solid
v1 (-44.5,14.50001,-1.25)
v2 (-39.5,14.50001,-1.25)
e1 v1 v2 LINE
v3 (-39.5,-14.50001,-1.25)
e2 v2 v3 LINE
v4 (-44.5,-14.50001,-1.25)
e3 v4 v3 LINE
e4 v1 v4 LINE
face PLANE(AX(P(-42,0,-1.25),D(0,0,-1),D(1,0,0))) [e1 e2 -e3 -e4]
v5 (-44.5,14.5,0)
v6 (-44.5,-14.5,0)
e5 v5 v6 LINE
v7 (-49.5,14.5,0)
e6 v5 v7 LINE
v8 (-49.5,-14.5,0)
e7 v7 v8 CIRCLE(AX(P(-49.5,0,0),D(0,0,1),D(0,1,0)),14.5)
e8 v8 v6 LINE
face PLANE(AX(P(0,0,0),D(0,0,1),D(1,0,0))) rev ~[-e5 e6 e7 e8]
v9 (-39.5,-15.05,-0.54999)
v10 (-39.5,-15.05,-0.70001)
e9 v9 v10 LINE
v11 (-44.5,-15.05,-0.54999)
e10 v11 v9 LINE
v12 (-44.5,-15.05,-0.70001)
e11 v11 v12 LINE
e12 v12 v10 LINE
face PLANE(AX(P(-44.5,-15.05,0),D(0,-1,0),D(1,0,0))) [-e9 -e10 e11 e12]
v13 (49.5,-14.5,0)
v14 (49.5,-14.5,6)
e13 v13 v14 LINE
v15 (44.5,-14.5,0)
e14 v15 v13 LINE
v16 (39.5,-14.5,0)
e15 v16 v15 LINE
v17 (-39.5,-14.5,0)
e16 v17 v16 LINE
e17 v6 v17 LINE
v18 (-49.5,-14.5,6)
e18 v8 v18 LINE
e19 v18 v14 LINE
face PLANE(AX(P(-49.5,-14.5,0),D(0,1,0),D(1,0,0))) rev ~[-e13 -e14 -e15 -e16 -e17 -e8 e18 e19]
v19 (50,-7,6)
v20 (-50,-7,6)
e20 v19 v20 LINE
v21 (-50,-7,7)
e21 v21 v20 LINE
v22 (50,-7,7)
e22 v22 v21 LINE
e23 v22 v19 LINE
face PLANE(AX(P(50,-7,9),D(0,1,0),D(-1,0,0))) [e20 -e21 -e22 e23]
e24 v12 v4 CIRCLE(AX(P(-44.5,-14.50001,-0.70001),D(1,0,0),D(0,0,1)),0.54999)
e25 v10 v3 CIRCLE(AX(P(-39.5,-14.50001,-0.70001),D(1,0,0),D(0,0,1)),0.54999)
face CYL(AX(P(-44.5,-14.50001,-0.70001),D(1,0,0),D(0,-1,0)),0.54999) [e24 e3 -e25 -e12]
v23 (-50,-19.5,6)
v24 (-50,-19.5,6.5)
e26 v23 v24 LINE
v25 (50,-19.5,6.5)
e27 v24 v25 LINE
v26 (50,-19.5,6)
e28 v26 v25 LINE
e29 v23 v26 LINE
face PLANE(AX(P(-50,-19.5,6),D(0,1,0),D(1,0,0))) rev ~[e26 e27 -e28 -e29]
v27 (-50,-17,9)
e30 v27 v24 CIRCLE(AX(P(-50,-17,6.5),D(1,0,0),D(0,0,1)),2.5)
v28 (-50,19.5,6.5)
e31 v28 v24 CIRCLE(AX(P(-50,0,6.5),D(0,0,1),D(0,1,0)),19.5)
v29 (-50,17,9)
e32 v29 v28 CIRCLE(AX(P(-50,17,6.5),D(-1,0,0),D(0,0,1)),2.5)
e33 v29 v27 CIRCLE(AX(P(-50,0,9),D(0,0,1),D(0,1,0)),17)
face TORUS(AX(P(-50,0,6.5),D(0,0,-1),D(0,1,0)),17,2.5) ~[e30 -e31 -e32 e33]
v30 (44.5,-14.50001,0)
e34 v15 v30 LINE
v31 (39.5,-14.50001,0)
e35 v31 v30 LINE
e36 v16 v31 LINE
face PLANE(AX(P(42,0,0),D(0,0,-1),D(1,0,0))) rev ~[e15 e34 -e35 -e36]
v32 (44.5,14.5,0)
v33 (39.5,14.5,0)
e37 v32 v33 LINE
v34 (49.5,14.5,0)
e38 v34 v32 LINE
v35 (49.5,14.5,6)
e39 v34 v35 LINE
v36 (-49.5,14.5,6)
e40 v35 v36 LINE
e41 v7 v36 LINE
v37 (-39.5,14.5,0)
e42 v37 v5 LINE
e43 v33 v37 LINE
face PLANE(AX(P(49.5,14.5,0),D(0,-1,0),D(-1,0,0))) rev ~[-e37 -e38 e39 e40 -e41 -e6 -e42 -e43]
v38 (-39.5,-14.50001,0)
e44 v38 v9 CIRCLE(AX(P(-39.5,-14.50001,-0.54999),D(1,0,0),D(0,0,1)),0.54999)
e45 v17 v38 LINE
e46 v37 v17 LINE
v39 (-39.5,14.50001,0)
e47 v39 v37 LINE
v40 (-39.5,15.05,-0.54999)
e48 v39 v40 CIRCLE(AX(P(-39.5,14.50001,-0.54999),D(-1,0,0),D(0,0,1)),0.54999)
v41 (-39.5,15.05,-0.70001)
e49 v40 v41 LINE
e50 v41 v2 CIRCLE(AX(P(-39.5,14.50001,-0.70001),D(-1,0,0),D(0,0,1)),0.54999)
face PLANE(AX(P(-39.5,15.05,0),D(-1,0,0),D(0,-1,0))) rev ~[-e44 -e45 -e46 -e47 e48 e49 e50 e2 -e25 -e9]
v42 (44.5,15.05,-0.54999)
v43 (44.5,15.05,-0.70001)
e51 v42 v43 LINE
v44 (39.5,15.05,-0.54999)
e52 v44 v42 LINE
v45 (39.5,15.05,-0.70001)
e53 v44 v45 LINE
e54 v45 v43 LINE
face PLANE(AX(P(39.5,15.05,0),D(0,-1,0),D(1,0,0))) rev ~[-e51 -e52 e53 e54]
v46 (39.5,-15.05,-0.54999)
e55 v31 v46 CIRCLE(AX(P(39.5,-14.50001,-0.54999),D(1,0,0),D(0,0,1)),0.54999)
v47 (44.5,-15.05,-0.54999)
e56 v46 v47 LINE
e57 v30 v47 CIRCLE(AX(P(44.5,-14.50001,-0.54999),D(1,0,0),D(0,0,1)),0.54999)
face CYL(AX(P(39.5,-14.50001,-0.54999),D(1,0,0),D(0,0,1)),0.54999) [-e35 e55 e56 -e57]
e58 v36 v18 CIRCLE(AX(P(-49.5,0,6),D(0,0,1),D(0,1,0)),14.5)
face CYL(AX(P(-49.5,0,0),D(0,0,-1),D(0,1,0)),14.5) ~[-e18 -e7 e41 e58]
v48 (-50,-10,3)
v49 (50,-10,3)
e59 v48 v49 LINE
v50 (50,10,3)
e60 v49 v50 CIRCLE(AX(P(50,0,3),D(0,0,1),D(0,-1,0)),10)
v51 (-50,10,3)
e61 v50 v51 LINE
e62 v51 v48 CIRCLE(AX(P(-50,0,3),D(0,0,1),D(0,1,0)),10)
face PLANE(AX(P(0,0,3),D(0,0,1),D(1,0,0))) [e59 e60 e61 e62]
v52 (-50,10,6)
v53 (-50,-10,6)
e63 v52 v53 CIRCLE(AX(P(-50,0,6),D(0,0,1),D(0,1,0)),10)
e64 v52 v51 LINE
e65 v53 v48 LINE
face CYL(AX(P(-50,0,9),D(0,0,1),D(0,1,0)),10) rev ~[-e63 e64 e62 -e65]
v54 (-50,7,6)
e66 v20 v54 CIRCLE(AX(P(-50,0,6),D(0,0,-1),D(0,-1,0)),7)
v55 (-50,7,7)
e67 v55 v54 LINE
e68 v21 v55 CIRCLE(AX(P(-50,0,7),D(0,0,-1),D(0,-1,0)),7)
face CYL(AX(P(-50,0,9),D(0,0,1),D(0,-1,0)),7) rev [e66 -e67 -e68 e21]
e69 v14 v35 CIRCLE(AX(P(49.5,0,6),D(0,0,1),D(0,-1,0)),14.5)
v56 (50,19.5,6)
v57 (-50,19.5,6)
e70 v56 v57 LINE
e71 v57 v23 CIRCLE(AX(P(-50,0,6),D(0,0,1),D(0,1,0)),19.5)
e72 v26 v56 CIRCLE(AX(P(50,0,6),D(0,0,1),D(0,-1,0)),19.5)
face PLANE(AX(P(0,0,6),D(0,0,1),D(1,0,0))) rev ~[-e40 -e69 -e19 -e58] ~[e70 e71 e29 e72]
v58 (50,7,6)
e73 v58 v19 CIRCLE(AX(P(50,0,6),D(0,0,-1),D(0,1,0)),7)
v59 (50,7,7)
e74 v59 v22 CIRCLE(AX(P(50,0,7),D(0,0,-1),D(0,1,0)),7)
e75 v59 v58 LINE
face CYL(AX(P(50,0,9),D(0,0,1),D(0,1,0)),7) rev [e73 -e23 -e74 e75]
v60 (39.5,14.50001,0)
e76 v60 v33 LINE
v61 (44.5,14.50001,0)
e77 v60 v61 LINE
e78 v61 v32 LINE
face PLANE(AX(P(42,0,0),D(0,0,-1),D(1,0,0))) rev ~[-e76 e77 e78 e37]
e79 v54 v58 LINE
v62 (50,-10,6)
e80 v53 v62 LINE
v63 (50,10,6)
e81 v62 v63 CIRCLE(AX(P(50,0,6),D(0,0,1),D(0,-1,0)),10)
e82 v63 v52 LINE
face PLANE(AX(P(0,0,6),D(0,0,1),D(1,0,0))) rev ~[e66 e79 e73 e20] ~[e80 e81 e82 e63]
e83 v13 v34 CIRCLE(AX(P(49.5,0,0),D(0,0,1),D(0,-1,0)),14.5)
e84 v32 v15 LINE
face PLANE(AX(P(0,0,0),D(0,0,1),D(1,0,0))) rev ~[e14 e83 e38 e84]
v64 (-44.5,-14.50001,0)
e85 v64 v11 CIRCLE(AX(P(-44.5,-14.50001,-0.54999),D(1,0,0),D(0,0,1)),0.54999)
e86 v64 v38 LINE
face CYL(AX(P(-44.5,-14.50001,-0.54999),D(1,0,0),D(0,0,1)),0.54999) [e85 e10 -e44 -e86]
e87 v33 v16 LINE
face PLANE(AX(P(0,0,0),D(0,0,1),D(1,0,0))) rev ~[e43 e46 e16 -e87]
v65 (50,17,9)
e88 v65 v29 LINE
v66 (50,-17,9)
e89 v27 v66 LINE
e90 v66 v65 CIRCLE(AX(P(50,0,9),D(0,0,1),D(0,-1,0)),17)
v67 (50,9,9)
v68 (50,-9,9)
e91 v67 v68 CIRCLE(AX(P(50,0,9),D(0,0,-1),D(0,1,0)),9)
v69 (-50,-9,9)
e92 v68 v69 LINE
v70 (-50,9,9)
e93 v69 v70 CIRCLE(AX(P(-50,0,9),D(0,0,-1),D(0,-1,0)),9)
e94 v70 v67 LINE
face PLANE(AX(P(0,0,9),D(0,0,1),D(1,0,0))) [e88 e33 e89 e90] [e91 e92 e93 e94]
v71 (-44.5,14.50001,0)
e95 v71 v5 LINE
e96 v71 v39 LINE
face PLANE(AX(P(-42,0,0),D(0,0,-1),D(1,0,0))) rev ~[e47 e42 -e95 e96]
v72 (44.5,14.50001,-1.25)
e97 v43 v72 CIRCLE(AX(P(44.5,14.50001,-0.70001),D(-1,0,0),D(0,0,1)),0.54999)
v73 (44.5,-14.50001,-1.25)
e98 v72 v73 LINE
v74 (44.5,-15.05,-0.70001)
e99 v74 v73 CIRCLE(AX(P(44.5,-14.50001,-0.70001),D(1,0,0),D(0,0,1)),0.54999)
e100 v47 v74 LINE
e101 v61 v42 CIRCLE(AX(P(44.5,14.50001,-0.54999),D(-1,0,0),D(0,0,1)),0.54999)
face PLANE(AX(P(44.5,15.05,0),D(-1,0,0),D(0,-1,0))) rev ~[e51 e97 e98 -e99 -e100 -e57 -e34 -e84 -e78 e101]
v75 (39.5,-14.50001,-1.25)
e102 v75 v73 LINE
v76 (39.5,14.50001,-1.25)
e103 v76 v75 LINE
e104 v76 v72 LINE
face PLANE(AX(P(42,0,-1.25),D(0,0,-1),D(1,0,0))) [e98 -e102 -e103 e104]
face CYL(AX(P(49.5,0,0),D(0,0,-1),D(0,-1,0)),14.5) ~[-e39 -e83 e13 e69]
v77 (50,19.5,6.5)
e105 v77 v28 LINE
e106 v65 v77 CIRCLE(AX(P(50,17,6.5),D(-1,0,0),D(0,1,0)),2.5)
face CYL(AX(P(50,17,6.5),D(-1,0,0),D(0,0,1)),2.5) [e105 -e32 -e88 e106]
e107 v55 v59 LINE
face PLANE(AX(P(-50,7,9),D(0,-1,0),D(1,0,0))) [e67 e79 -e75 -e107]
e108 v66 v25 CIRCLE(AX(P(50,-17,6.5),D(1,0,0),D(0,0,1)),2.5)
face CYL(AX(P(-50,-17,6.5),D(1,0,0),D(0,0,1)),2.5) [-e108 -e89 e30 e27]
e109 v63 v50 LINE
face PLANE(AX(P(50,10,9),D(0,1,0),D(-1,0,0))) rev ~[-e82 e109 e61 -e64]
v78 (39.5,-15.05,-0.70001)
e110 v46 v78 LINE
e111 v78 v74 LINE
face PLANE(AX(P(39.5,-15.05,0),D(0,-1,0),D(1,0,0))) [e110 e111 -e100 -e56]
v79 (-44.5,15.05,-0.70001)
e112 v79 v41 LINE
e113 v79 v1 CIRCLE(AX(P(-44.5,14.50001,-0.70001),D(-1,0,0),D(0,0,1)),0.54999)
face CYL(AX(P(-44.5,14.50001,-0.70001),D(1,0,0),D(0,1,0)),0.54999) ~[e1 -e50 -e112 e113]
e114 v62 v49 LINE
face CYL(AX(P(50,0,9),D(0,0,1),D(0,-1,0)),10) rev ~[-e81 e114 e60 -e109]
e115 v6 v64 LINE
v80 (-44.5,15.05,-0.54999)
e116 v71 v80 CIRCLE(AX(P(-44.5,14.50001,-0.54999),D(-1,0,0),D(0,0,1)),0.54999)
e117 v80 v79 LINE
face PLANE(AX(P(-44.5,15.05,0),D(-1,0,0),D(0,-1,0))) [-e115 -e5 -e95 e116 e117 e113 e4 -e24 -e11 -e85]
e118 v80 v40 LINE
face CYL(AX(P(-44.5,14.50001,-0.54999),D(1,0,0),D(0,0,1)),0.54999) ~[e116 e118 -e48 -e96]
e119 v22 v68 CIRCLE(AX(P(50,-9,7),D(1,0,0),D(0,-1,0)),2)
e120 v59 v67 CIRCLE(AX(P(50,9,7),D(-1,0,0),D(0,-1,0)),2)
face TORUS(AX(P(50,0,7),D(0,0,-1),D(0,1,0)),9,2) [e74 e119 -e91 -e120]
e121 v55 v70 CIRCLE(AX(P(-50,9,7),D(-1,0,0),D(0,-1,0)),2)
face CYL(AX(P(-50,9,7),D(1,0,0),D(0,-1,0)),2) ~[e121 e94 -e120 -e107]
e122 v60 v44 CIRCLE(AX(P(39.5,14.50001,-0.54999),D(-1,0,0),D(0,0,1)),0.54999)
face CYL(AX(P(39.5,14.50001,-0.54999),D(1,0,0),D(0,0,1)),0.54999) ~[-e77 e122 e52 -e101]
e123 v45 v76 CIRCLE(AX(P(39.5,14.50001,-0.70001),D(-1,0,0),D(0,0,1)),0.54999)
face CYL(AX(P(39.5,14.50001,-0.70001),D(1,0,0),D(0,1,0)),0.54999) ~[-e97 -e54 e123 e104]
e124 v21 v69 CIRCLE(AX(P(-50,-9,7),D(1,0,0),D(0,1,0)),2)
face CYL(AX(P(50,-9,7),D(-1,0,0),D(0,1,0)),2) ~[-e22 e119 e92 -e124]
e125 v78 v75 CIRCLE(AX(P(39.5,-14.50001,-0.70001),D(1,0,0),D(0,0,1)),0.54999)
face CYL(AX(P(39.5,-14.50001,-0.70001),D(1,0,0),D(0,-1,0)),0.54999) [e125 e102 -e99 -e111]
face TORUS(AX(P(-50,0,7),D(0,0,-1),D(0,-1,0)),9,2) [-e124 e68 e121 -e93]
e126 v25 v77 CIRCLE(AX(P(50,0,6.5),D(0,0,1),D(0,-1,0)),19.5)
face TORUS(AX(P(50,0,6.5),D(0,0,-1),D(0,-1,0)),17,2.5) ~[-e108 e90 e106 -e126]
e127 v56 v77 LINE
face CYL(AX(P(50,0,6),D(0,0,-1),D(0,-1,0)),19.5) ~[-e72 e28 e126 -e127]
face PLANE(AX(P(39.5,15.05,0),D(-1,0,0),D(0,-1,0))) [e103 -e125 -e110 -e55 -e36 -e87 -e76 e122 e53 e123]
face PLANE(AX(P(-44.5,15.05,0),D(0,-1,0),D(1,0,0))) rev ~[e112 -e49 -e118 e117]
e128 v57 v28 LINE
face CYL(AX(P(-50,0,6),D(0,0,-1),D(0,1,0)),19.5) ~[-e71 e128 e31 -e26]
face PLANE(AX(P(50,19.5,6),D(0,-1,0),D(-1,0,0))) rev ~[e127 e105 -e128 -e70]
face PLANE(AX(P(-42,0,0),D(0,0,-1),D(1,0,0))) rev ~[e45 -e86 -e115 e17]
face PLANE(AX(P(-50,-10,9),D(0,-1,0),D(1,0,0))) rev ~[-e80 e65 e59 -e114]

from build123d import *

# Parameters (mm, degrees)
F1_DEPTH  = 6
F3_DEPTH  = 3
F4_R      = 2.5
F5_W      = 5
F5_H      = 30.1
F6_DEPTH  = 1.25
F8_DEPTH  = 6
F10_DEPTH = 3
F11_R     = 2
F12_R     = 0.54999


# Not quite as in the source:
# - a fillet or chamfer is up to 0.001 mm smaller than in the source, because OpenCascade refuses the exact size


with BuildPart() as f1:
    # F0 (on Top) → F1 (new body)
    with BuildSketch(Plane.XY):
        with BuildLine():
            Line((49.5, 14.5), (-49.5, 14.5))
            ThreePointArc((-49.5, 14.5), (-64, 0), (-49.5, -14.5))
            Line((-49.5, -14.5), (49.5, -14.5))
            ThreePointArc((49.5, -14.5), (64, 0), (49.5, 14.5))
        make_face()
    extrude(amount=F1_DEPTH)

    # F2 (on face) → F3 (join)
    with BuildSketch(Plane.XY.offset(6)):
        with BuildLine():
            Line((50, 19.5), (-50, 19.5))
            ThreePointArc((-50, 19.5), (-69.5, 0), (-50, -19.5))
            Line((-50, -19.5), (50, -19.5))
            ThreePointArc((50, -19.5), (69.5, 0), (50, 19.5))
        make_face()
    extrude(amount=F3_DEPTH)

    # F4
    f4_edges = [f1.edges().sort_by_distance(p)[0] for p in [
        (0, -19.5, 9),
    ]]
    fillet(f4_edges, radius=F4_R)

    # F5 (on face) → F6 (join)
    with BuildSketch(Plane(origin=(0, 0, 0), x_dir=(1, 0, 0), z_dir=(0, 0, -1))):
        with Locations((-42, 0)):
            Rectangle(F5_W, F5_H)
        with Locations((42, 0)):
            Rectangle(F5_W, F5_H)
    extrude(amount=F6_DEPTH)

    # F7 (on face) → F8 (cut)
    with BuildSketch(Plane.XY.offset(9)):
        with BuildLine():
            Line((50, 10), (-50, 10))
            ThreePointArc((-50, 10), (-60, 0), (-50, -10))
            Line((-50, -10), (50, -10))
            ThreePointArc((50, -10), (60, 0), (50, 10))
        make_face()
    extrude(amount=-F8_DEPTH, mode=Mode.SUBTRACT)

    # F9 (on face) → F10 (join)
    with BuildSketch(Plane.XY.offset(9)):
        with BuildLine():
            Line((50, 10), (-50, 10))
            ThreePointArc((-50, 10), (-60, 0), (-50, -10))
            Line((-50, -10), (50, -10))
            ThreePointArc((50, -10), (60, 0), (50, 10))
        make_face()
        with BuildLine():
            ThreePointArc((50, 7), (57, 0), (50, -7))
            Line((50, -7), (-50, -7))
            ThreePointArc((-50, -7), (-57, 0), (-50, 7))
            Line((-50, 7), (50, 7))
        make_face(mode=Mode.SUBTRACT)
    extrude(amount=-F10_DEPTH)

    # F11
    f11_edges = [f1.edges().sort_by_distance(p)[0] for p in [
        (0, 7, 9),
    ]]
    fillet(f11_edges, radius=F11_R)

    # F12 (radius 0.55 in the source; OpenCascade refuses exactly that, so slightly less here)
    f12_edges = [f1.edges().sort_by_distance(p)[0] for p in [
        (-42, -15.05, 0),
        (-42, -15.05, -1.25),
        (42, -15.05, -1.25),
        (42, -15.05, 0),
        (-42, 15.05, -1.25),
        (-42, 15.05, 0),
        (42, 15.05, 0),
        (42, 15.05, -1.25),
    ]]
    fillet(f12_edges, radius=F12_R)


solid = f1.part
